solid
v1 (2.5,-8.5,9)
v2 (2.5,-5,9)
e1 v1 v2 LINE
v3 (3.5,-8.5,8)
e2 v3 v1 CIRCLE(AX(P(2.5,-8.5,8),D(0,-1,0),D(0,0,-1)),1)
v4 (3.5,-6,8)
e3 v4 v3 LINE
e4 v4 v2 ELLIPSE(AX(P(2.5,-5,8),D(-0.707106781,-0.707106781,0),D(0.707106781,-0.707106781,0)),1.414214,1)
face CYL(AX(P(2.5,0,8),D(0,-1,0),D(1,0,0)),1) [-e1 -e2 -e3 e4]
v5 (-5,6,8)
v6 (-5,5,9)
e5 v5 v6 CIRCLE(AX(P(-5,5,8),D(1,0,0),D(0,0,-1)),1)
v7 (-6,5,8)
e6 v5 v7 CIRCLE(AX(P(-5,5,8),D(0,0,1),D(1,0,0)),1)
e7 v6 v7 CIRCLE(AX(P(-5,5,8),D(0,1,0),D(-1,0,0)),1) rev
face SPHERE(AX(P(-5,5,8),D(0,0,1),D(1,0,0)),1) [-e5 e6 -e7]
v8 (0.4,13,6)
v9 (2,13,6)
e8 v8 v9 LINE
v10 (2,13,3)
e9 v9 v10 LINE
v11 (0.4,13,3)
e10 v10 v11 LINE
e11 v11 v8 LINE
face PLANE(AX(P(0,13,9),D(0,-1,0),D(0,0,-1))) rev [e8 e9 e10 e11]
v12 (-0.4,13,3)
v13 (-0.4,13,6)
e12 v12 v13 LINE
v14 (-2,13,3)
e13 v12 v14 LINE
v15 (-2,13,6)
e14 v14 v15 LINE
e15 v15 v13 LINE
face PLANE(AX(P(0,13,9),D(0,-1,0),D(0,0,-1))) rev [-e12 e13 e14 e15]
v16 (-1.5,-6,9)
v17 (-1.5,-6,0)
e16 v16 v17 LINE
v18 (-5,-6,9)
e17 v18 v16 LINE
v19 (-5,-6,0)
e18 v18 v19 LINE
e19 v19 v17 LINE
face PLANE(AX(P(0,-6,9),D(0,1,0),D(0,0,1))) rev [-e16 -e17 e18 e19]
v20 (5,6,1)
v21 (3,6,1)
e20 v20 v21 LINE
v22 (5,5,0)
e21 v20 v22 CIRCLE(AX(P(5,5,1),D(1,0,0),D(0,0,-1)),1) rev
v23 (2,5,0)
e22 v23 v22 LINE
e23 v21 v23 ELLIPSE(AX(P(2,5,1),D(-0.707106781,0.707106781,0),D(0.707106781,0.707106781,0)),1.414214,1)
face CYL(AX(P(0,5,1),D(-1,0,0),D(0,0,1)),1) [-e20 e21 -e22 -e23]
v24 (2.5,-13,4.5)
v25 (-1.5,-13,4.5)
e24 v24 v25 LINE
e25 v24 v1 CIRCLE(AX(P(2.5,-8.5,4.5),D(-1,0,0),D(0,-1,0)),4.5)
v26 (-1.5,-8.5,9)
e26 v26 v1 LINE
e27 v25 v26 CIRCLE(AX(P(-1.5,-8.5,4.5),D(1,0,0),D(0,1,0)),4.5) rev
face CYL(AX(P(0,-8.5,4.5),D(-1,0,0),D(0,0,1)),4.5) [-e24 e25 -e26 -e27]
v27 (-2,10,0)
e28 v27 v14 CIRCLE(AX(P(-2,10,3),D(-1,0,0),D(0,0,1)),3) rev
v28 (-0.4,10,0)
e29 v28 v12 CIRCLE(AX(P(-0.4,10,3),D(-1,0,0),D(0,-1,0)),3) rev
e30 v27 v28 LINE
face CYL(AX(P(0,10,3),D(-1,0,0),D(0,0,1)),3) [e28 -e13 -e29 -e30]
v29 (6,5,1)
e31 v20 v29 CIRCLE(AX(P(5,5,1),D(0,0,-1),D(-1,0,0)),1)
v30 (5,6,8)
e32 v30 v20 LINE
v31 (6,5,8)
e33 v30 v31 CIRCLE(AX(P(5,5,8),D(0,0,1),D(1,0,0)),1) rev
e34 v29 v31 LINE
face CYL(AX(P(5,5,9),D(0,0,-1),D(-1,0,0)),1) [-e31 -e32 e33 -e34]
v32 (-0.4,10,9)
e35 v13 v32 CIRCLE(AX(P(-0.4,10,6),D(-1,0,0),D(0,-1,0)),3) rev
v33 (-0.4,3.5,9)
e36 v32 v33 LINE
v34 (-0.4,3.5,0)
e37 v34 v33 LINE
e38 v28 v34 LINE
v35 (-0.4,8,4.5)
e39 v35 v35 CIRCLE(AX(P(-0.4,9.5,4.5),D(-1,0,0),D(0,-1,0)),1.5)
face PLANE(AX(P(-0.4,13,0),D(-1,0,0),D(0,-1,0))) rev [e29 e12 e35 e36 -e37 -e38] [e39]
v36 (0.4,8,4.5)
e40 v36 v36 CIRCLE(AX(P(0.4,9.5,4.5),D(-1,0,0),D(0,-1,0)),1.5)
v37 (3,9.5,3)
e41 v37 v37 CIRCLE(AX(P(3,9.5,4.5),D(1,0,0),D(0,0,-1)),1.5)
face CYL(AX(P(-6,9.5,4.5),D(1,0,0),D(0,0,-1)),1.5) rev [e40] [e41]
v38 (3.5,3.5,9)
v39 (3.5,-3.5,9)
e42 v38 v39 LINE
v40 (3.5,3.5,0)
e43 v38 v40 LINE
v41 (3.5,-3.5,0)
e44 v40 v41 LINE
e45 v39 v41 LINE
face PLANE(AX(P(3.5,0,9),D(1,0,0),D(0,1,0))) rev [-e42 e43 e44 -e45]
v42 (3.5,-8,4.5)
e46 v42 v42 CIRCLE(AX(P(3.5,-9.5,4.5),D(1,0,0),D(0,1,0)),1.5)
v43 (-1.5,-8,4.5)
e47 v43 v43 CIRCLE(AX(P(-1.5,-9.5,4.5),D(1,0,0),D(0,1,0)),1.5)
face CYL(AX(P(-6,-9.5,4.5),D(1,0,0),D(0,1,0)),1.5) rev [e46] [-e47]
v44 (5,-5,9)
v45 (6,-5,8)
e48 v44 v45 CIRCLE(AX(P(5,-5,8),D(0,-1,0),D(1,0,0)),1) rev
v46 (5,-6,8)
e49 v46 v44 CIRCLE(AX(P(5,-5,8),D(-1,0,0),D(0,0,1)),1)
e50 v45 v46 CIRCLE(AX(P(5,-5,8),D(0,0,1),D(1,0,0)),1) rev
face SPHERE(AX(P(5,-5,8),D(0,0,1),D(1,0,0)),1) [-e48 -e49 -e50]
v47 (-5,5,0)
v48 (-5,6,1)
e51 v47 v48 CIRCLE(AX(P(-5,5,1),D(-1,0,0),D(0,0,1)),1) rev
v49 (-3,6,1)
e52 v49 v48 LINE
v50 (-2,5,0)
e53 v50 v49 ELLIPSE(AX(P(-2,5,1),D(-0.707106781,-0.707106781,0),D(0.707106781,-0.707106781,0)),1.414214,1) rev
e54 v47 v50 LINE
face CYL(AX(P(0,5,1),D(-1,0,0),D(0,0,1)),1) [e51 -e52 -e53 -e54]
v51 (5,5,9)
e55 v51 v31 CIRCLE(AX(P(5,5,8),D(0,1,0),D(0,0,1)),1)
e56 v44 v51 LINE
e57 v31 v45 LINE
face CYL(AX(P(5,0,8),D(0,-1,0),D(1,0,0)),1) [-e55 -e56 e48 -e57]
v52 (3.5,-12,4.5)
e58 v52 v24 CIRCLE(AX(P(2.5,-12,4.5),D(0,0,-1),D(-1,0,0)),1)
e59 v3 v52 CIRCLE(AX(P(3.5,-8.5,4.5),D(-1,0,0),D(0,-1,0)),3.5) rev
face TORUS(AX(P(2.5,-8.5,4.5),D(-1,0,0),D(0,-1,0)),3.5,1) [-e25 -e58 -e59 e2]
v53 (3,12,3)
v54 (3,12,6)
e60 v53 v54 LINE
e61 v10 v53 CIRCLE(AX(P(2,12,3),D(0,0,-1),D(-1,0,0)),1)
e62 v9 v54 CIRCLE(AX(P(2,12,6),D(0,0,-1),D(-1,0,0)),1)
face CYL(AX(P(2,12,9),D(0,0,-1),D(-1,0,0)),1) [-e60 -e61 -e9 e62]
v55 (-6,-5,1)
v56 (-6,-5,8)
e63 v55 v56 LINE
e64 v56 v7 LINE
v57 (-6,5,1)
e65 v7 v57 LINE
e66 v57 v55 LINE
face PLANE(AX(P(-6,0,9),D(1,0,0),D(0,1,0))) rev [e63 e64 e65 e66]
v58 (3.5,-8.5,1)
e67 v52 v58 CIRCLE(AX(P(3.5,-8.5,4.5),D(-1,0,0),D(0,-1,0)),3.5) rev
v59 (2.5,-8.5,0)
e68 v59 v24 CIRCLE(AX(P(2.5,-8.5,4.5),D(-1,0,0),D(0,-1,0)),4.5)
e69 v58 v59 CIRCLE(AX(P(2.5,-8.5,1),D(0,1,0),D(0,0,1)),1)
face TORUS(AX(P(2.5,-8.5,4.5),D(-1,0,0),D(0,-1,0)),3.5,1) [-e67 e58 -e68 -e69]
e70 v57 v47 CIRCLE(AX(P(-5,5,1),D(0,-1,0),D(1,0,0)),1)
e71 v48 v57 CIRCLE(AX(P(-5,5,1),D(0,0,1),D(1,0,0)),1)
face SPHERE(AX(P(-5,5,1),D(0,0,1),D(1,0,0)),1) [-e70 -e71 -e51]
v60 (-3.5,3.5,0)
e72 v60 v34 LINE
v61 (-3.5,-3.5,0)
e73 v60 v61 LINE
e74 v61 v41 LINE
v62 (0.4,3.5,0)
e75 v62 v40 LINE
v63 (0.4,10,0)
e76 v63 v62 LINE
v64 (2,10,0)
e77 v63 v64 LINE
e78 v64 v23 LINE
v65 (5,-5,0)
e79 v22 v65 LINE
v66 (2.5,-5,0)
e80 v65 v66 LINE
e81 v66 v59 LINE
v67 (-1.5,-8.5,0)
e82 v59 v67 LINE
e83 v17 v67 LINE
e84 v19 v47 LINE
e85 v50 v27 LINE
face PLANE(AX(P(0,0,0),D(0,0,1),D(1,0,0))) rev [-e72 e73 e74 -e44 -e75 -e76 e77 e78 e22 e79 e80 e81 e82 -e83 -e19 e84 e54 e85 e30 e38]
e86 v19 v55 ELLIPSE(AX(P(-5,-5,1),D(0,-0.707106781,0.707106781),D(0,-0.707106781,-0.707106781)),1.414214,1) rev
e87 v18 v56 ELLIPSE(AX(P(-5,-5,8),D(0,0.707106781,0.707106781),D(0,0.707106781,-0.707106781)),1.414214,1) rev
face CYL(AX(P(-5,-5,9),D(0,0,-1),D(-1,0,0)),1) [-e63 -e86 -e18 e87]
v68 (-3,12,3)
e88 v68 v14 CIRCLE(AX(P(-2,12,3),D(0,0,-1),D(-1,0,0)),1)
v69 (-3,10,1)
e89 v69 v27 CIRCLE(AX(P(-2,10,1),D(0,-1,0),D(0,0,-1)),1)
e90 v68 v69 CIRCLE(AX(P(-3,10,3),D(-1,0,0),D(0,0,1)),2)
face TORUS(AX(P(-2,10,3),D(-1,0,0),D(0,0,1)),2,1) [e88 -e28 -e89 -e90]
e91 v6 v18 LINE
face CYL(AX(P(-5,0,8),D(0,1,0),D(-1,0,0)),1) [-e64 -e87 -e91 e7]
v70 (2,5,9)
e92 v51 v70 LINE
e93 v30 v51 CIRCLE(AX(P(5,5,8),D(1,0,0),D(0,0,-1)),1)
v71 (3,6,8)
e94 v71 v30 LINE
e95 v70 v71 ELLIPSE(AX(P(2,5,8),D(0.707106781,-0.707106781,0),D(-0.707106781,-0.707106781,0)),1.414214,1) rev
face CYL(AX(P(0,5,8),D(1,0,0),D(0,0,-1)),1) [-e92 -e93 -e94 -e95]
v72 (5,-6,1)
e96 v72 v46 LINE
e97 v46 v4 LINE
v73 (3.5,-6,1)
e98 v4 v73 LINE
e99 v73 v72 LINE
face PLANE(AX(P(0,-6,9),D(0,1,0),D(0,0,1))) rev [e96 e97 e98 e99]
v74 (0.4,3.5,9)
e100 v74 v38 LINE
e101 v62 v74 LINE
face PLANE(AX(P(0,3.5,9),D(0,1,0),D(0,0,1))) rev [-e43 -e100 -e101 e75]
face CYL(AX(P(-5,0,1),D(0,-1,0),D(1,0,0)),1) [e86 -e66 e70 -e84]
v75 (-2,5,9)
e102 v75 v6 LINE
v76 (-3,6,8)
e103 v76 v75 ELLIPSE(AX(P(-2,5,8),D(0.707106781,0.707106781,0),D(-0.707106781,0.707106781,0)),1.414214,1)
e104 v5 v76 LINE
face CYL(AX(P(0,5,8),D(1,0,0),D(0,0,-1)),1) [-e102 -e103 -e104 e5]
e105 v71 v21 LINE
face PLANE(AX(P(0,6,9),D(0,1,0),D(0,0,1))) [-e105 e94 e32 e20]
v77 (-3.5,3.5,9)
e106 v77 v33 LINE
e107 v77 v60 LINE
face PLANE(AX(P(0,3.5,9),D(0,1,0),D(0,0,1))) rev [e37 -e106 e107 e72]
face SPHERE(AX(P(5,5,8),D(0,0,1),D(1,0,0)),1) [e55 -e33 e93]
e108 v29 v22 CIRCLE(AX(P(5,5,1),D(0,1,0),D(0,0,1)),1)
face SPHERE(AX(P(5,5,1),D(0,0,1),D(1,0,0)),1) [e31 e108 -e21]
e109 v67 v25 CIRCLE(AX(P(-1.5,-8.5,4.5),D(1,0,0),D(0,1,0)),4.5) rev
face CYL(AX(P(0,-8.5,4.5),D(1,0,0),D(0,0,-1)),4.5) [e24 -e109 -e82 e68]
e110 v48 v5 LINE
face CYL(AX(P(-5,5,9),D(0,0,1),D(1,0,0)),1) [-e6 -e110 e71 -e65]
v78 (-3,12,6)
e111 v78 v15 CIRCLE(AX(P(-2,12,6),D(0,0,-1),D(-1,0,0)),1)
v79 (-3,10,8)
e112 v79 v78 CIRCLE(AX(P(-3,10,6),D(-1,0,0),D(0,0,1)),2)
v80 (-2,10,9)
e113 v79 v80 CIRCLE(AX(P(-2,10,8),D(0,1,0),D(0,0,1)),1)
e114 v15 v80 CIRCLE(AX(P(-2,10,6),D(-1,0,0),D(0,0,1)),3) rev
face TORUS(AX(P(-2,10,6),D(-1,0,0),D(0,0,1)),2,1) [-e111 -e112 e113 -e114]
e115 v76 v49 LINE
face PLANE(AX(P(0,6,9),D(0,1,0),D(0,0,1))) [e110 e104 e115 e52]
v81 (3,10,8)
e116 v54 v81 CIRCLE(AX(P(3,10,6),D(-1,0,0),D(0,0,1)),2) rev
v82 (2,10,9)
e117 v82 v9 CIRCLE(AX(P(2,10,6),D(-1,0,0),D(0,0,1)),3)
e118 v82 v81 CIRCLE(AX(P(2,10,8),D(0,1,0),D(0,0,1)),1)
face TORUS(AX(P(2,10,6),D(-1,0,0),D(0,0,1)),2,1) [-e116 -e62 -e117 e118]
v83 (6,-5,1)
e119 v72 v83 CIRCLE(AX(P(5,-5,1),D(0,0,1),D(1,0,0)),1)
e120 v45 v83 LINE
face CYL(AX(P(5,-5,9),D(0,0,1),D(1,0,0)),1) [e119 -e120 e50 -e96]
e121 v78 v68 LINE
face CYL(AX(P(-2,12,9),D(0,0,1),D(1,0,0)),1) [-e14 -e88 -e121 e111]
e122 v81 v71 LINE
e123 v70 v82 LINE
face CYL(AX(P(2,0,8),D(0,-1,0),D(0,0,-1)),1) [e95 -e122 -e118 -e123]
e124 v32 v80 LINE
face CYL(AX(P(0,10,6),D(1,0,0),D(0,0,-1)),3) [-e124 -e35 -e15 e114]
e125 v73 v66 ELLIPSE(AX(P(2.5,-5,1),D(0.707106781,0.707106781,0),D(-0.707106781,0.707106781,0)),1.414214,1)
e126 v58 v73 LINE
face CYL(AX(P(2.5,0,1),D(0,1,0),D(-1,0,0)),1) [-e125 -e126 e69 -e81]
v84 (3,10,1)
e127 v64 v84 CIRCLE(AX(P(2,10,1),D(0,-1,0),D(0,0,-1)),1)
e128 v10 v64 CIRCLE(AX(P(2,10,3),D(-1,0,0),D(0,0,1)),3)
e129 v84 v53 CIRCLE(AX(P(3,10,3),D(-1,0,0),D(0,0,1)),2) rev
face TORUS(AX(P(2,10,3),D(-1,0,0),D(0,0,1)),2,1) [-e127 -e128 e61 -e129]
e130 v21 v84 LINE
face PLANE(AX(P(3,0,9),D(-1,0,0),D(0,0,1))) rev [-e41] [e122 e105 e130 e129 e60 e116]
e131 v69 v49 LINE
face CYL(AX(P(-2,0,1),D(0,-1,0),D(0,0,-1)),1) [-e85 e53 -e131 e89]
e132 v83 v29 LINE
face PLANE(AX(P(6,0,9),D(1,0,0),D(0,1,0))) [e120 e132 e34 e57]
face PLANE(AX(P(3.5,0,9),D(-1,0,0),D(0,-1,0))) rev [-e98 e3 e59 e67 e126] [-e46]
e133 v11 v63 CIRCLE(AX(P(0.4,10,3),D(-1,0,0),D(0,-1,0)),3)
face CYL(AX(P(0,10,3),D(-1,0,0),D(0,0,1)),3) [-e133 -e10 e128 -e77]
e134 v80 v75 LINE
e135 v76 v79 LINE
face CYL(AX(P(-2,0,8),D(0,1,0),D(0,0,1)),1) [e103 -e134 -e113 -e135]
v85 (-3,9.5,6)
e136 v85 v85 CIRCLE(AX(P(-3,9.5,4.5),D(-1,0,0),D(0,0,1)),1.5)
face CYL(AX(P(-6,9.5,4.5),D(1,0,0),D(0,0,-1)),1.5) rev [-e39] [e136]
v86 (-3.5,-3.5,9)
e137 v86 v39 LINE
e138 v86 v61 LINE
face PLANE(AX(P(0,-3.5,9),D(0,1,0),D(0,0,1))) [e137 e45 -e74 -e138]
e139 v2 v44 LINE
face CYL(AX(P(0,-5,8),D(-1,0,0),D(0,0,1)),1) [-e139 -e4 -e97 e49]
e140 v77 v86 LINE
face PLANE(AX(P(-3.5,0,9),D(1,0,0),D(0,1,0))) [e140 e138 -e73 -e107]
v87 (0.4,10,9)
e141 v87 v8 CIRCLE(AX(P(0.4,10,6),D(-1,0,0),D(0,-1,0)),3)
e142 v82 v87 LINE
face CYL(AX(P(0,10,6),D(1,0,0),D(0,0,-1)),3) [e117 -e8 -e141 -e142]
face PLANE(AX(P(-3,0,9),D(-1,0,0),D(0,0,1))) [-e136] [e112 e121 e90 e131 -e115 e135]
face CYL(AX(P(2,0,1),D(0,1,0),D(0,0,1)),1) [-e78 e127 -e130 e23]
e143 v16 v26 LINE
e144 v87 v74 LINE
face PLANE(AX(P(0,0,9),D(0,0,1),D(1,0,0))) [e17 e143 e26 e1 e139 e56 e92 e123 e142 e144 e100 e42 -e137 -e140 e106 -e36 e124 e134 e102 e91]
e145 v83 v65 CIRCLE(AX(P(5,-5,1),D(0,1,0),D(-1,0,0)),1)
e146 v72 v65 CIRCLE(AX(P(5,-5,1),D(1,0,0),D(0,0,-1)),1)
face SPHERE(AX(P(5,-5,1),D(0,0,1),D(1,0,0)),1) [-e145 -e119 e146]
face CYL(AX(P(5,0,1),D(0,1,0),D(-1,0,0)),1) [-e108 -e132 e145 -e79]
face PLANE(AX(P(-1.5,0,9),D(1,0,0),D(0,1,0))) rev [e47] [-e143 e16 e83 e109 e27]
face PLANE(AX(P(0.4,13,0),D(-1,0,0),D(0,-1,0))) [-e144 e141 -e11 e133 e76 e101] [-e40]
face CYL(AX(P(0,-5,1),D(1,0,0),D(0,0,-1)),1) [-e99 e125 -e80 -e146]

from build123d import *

# Parameters (mm, degrees)
SKETCH_1_W          = 3
SKETCH_1_H          = 7
SKETCH_1_W_2        = 12
SKETCH_1_H_2        = 12
SKETCH_1_W_3        = 7
SKETCH_1_W_4        = 5
EXTRUDE_1_DEPTH     = 9
CUT_EXTRUDE_1_DEPTH = 17.911534525
FILLET_1_R          = 4.5
SKETCH_3_R          = 1.5
CUT_EXTRUDE_2_DEPTH = 19.445866746
FILLET_2_R          = 3
SKETCH_4_R          = 1.5
CUT_EXTRUDE_3_DEPTH = 19.193405399
FILLET_3_R          = 1
FILLET_4_R          = 1
FILLET_5_R          = 1
FILLET_6_R          = 1


# Some blends are built 0.0001 mm under size
with BuildPart() as part:
    # 草图1 → 凸台-拉伸1 (new body)
    # profile 1 of 4: a face of its own
    with BuildSketch(Plane.XY):
        with Locations((-1.5, 9.5)):
            Rectangle(SKETCH_1_W, SKETCH_1_H)
    # profile 2 of 4: a face of its own
    with BuildSketch(Plane.XY):
        with Locations((1.5, 9.5)):
            Rectangle(SKETCH_1_W, SKETCH_1_H)
    # profile 3 of 4: a face of its own
    with BuildSketch(Plane.XY):
        Rectangle(SKETCH_1_W_2, SKETCH_1_H_2)
        Rectangle(SKETCH_1_W_3, SKETCH_1_H, mode=Mode.SUBTRACT)
    # profile 4 of 4: a face of its own
    with BuildSketch(Plane.XY):
        with Locations((1, -9.5)):
            Rectangle(SKETCH_1_W_4, SKETCH_1_H)
    extrude(amount=EXTRUDE_1_DEPTH)

    # 草图2 → 切除-拉伸1 (cut, through all)
    with BuildSketch(Plane.XY.offset(9)):
        Polygon((0, 13), (0.4, 13), (0.4, 3.5), (0, 3.5), (-0.4, 3.5), (-0.4, 13), align=None)
    extrude(amount=-CUT_EXTRUDE_1_DEPTH, mode=Mode.SUBTRACT)

    # 圆角1
    fillet_1_edges = [part.edges().sort_by_distance(p)[0] for p in [
        (1, -13, 0),
        (1, -13, 9),
    ]]
    fillet(fillet_1_edges, radius=FILLET_1_R - 0.0001)  # a hair under: the kernel refuses the full size

    # 草图3 → 切除-拉伸2 (cut, through all)
    with BuildSketch(Plane(origin=(3.5, 0, 0), x_dir=(0, 0, -1), z_dir=(1, 0, 0))):
        with Locations(Location((-4.5, -9.5, 0), (0, 0, 90))):
            Circle(SKETCH_3_R)
    extrude(amount=-CUT_EXTRUDE_2_DEPTH, mode=Mode.SUBTRACT)

    # 圆角2
    fillet_2_edges = [part.edges().sort_by_distance(p)[0] for p in [
        (1.7, 13, 9),
        (1.7, 13, 0),
        (-1.7, 13, 0),
        (-1.7, 13, 9),
    ]]
    fillet(fillet_2_edges, radius=FILLET_2_R)

    # 草图4 → 切除-拉伸3 (cut, through all)
    with BuildSketch(Plane(origin=(3, 0, 0), x_dir=(0, 0, -1), z_dir=(1, 0, 0))):
        with Locations((-4.5, 9.5)):
            Circle(SKETCH_4_R)
    extrude(amount=-CUT_EXTRUDE_3_DEPTH, mode=Mode.SUBTRACT)

    # 圆角3
    fillet_3_edges = [part.edges().sort_by_distance(p)[0] for p in [
        (3, 12.121320344, 8.121320344),
        (3, 12.121320344, 0.878679656),
        (3, 8, 9),
        (6, 0, 0),
        (3, 8, 0),
        (4.5, 6, 0),
        (6, 6, 4.5),
        (6, -6, 4.5),
        (4.5, 6, 9),
        (6, 0, 9),
        (3, 13, 4.5),
    ]]
    fillet(fillet_3_edges, radius=FILLET_3_R)

    # 圆角4
    fillet_4_edges = [part.edges().sort_by_distance(p)[0] for p in [
        (-3, 13, 4.5),
        (-3, 12.121320344, 8.121320344),
        (-3, 12.121320344, 0.878679656),
        (-3, 8, 9),
        (-6, 0, 0),
        (-4.5, 6, 0),
        (-3, 8, 0),
        (-4.5, 6, 9),
        (-6, 0, 9),
        (-6, -6, 4.5),
    ]]
    fillet(fillet_4_edges, radius=FILLET_4_R)

    # 圆角5
    # the kernel refuses this fillet: 1 mm, written as the material it takes off along each edge
    with BuildSketch(Plane(origin=(-5, 5, 8), x_dir=(0, 1, 0), z_dir=(-1, 0, 0))) as fillet_5_piece_1_section:
        Polygon((0, 0), (FILLET_5_R, 0), (FILLET_5_R, -FILLET_5_R), (0, -FILLET_5_R), align=None)
    fillet_5_piece_1 = extrude(amount=FILLET_5_R, mode=Mode.PRIVATE)
    fillet_5_piece_1 = fillet_5_piece_1 - Plane(origin=(-5, 5, 8), x_dir=(0, -0.7071067811865475, -0.7071067811865475), z_dir=(-1, 0, 0)) * Sphere(FILLET_5_R, mode=Mode.PRIVATE)
    add(fillet_5_piece_1, mode=Mode.SUBTRACT)
    with BuildSketch(Plane(origin=(-5, 5, 1), x_dir=(0, 1, 0), z_dir=(-1, 0, 0))) as fillet_5_piece_2_section:
        Polygon((0, 0), (FILLET_5_R, 0), (FILLET_5_R, FILLET_5_R), (0, FILLET_5_R), align=None)
    fillet_5_piece_2 = extrude(amount=FILLET_5_R, mode=Mode.PRIVATE)
    fillet_5_piece_2 = fillet_5_piece_2 - Plane(origin=(-5, 5, 1), x_dir=(0, -0.7071067811865475, 0.7071067811865475), z_dir=(-1, 0, 0)) * Sphere(FILLET_5_R, mode=Mode.PRIVATE)
    add(fillet_5_piece_2, mode=Mode.SUBTRACT)
    with BuildSketch(Plane(origin=(-6, 6, 1), x_dir=(0, -1, 0), z_dir=(0, 0, 1))) as fillet_5_piece_3:
        with BuildLine():
            CenterArc((FILLET_5_R, FILLET_5_R), FILLET_5_R, 180, 90)
            Line((0, FILLET_5_R), (0, 0))
            Line((0, 0), (FILLET_5_R, 0))
        make_face()
    extrude(amount=7, mode=Mode.SUBTRACT)

    # 圆角6
    # the kernel refuses this fillet: 1 mm, written as the material it takes off along each edge
    with BuildSketch(Plane(origin=(5, -5, 8), x_dir=(0, 0, 1), z_dir=(0, -1, 0))) as fillet_6_piece_1_section:
        Polygon((0, 0), (FILLET_6_R, 0), (FILLET_6_R, -FILLET_6_R), (0, -FILLET_6_R), align=None)
    fillet_6_piece_1 = extrude(amount=FILLET_6_R, mode=Mode.PRIVATE)
    fillet_6_piece_1 = fillet_6_piece_1 - Plane(origin=(5, -5, 8), x_dir=(-0.7071067811865475, 0, -0.7071067811865475), z_dir=(0, -1, 0)) * Sphere(FILLET_6_R, mode=Mode.PRIVATE)
    add(fillet_6_piece_1, mode=Mode.SUBTRACT)
    with BuildSketch(Plane(origin=(5, -5, 1), x_dir=(0, -1, 0), z_dir=(0, 0, -1))) as fillet_6_piece_2_section:
        Polygon((0, 0), (FILLET_6_R, 0), (FILLET_6_R, -FILLET_6_R), (0, -FILLET_6_R), align=None)
    fillet_6_piece_2 = extrude(amount=FILLET_6_R, mode=Mode.PRIVATE)
    fillet_6_piece_2 = fillet_6_piece_2 - Plane(origin=(5, -5, 1), x_dir=(-0.7071067811865476, 0.7071067811865475, 0), z_dir=(0, 0, -1)) * Sphere(FILLET_6_R, mode=Mode.PRIVATE)
    add(fillet_6_piece_2, mode=Mode.SUBTRACT)
    with BuildSketch(Plane(origin=(5, -6, 0), x_dir=(0, 1, 0), z_dir=(-1, 0, 0)), Plane(origin=(5, -6, 9), x_dir=(0, 0, -1), z_dir=(-1, 0, 0))) as fillet_6_piece_3:
        with BuildLine():
            CenterArc((FILLET_6_R, -FILLET_6_R), FILLET_6_R, 90, 90)
            Line((0, -FILLET_6_R), (0, 0))
            Line((0, 0), (FILLET_6_R, 0))
        make_face()
    extrude(amount=1.5, mode=Mode.SUBTRACT)
    with BuildSketch(Plane(origin=(3.5, -8.5001, 0), x_dir=(-1, 0, 0), z_dir=(0, 1, 0)), Plane(origin=(3.5, -8.5001, 9), x_dir=(0, 0, -1), z_dir=(0, 1, 0))) as fillet_6_piece_4:
        with BuildLine():
            CenterArc((FILLET_6_R, FILLET_6_R), FILLET_6_R, 180, 90)
            Line((0, FILLET_6_R), (0, 0))
            Line((0, 0), (FILLET_6_R, 0))
        make_face()
    extrude(amount=2.5001, mode=Mode.SUBTRACT)
    with BuildSketch(Plane(origin=(3.5, -8.5001, 4.5001), x_dir=(0, 0, 1), z_dir=(0, 1, 0))) as fillet_6_piece_5:
        with BuildLine():
            CenterArc((4.4999 - FILLET_6_R, -FILLET_6_R), FILLET_6_R, 0, 90)
            Line((4.4999, -FILLET_6_R), (4.4999, 0))
            Line((4.4999, 0), (4.4999 - FILLET_6_R, 0))
        make_face()
    revolve(axis=Axis((3.5, -8.5001, 4.5001), (1, 0, 0)), revolution_arc=90, mode=Mode.SUBTRACT)
    with BuildSketch(Plane(origin=(3.5, -8.5001, 4.4999), x_dir=(0, 0, -1), z_dir=(0, 1, 0))) as fillet_6_piece_6:
        with BuildLine():
            CenterArc((4.4999 - FILLET_6_R, FILLET_6_R), FILLET_6_R, 270, 90)
            Line((4.4999 - FILLET_6_R, 0), (4.4999, 0))
            Line((4.4999, 0), (4.4999, FILLET_6_R))
        make_face()
    revolve(axis=Axis((3.5, -8.5001, 4.4999), (-1, 0, 0)), revolution_arc=90, mode=Mode.SUBTRACT)
    with BuildSketch(Plane(origin=(3.5, -13, 4.4999), x_dir=(0, 1, 0), z_dir=(0, 0, 1))) as fillet_6_piece_7:
        with BuildLine():
            CenterArc((FILLET_6_R, FILLET_6_R), FILLET_6_R, 180, 90)
            Line((0, FILLET_6_R), (0, 0))
            Line((0, 0), (FILLET_6_R, 0))
        make_face()
    extrude(amount=0.0002, mode=Mode.SUBTRACT)
    with BuildSketch(Plane(origin=(3.5, -8.5001, 0), x_dir=(-1, 0, 0), z_dir=(0, 1, 0))) as fillet_6_piece_8a_section:
        with BuildLine():
            CenterArc((FILLET_6_R, FILLET_6_R), FILLET_6_R, 180, 90)
            Line((0, FILLET_6_R), (0, 0))
            Line((0, 0), (FILLET_6_R, 0))
        make_face()
    fillet_6_piece_8a = extrude(amount=5.0001, mode=Mode.PRIVATE)
    fillet_6_piece_8a = split(fillet_6_piece_8a, bisect_by=Plane(origin=(3.273604886, -6, 0.226395114), z_dir=(0, 1, 0)), keep=Keep.TOP, mode=Mode.PRIVATE)
    with BuildSketch(Plane(origin=(5, -6, 0), x_dir=(0, 1, 0), z_dir=(-1, 0, 0))) as fillet_6_piece_8b_section:
        with BuildLine():
            CenterArc((FILLET_6_R, -FILLET_6_R), FILLET_6_R, 90, 90)
            Line((0, -FILLET_6_R), (0, 0))
            Line((0, 0), (FILLET_6_R, 0))
        make_face()
    fillet_6_piece_8b = extrude(amount=4, mode=Mode.PRIVATE)
    fillet_6_piece_8b = split(fillet_6_piece_8b, bisect_by=Plane(origin=(3.5, -5.773604886, 0.226395114), z_dir=(-1, 0, 0)), keep=Keep.TOP, mode=Mode.PRIVATE)
    fillet_6_piece_8 = fillet_6_piece_8a & fillet_6_piece_8b
    add(fillet_6_piece_8, mode=Mode.SUBTRACT)
    with BuildSketch(Plane(origin=(3.5, -8.5001, 9), x_dir=(0, 0, -1), z_dir=(0, 1, 0))) as fillet_6_piece_9a_section:
        with BuildLine():
            CenterArc((FILLET_6_R, FILLET_6_R), FILLET_6_R, 180, 90)
            Line((0, FILLET_6_R), (0, 0))
            Line((0, 0), (FILLET_6_R, 0))
        make_face()
    fillet_6_piece_9a = extrude(amount=5.0001, mode=Mode.PRIVATE)
    fillet_6_piece_9a = split(fillet_6_piece_9a, bisect_by=Plane(origin=(3.273604886, -6, 8.773604886), z_dir=(0, 1, 0)), keep=Keep.TOP, mode=Mode.PRIVATE)
    with BuildSketch(Plane(origin=(5, -6, 9), x_dir=(0, 0, -1), z_dir=(-1, 0, 0))) as fillet_6_piece_9b_section:
        with BuildLine():
            CenterArc((FILLET_6_R, -FILLET_6_R), FILLET_6_R, 90, 90)
            Line((0, -FILLET_6_R), (0, 0))
            Line((0, 0), (FILLET_6_R, 0))
        make_face()
    fillet_6_piece_9b = extrude(amount=4, mode=Mode.PRIVATE)
    fillet_6_piece_9b = split(fillet_6_piece_9b, bisect_by=Plane(origin=(3.5, -5.773604886, 8.773604886), z_dir=(-1, 0, 0)), keep=Keep.TOP, mode=Mode.PRIVATE)
    fillet_6_piece_9 = fillet_6_piece_9a & fillet_6_piece_9b
    add(fillet_6_piece_9, mode=Mode.SUBTRACT)


solid = part.part
